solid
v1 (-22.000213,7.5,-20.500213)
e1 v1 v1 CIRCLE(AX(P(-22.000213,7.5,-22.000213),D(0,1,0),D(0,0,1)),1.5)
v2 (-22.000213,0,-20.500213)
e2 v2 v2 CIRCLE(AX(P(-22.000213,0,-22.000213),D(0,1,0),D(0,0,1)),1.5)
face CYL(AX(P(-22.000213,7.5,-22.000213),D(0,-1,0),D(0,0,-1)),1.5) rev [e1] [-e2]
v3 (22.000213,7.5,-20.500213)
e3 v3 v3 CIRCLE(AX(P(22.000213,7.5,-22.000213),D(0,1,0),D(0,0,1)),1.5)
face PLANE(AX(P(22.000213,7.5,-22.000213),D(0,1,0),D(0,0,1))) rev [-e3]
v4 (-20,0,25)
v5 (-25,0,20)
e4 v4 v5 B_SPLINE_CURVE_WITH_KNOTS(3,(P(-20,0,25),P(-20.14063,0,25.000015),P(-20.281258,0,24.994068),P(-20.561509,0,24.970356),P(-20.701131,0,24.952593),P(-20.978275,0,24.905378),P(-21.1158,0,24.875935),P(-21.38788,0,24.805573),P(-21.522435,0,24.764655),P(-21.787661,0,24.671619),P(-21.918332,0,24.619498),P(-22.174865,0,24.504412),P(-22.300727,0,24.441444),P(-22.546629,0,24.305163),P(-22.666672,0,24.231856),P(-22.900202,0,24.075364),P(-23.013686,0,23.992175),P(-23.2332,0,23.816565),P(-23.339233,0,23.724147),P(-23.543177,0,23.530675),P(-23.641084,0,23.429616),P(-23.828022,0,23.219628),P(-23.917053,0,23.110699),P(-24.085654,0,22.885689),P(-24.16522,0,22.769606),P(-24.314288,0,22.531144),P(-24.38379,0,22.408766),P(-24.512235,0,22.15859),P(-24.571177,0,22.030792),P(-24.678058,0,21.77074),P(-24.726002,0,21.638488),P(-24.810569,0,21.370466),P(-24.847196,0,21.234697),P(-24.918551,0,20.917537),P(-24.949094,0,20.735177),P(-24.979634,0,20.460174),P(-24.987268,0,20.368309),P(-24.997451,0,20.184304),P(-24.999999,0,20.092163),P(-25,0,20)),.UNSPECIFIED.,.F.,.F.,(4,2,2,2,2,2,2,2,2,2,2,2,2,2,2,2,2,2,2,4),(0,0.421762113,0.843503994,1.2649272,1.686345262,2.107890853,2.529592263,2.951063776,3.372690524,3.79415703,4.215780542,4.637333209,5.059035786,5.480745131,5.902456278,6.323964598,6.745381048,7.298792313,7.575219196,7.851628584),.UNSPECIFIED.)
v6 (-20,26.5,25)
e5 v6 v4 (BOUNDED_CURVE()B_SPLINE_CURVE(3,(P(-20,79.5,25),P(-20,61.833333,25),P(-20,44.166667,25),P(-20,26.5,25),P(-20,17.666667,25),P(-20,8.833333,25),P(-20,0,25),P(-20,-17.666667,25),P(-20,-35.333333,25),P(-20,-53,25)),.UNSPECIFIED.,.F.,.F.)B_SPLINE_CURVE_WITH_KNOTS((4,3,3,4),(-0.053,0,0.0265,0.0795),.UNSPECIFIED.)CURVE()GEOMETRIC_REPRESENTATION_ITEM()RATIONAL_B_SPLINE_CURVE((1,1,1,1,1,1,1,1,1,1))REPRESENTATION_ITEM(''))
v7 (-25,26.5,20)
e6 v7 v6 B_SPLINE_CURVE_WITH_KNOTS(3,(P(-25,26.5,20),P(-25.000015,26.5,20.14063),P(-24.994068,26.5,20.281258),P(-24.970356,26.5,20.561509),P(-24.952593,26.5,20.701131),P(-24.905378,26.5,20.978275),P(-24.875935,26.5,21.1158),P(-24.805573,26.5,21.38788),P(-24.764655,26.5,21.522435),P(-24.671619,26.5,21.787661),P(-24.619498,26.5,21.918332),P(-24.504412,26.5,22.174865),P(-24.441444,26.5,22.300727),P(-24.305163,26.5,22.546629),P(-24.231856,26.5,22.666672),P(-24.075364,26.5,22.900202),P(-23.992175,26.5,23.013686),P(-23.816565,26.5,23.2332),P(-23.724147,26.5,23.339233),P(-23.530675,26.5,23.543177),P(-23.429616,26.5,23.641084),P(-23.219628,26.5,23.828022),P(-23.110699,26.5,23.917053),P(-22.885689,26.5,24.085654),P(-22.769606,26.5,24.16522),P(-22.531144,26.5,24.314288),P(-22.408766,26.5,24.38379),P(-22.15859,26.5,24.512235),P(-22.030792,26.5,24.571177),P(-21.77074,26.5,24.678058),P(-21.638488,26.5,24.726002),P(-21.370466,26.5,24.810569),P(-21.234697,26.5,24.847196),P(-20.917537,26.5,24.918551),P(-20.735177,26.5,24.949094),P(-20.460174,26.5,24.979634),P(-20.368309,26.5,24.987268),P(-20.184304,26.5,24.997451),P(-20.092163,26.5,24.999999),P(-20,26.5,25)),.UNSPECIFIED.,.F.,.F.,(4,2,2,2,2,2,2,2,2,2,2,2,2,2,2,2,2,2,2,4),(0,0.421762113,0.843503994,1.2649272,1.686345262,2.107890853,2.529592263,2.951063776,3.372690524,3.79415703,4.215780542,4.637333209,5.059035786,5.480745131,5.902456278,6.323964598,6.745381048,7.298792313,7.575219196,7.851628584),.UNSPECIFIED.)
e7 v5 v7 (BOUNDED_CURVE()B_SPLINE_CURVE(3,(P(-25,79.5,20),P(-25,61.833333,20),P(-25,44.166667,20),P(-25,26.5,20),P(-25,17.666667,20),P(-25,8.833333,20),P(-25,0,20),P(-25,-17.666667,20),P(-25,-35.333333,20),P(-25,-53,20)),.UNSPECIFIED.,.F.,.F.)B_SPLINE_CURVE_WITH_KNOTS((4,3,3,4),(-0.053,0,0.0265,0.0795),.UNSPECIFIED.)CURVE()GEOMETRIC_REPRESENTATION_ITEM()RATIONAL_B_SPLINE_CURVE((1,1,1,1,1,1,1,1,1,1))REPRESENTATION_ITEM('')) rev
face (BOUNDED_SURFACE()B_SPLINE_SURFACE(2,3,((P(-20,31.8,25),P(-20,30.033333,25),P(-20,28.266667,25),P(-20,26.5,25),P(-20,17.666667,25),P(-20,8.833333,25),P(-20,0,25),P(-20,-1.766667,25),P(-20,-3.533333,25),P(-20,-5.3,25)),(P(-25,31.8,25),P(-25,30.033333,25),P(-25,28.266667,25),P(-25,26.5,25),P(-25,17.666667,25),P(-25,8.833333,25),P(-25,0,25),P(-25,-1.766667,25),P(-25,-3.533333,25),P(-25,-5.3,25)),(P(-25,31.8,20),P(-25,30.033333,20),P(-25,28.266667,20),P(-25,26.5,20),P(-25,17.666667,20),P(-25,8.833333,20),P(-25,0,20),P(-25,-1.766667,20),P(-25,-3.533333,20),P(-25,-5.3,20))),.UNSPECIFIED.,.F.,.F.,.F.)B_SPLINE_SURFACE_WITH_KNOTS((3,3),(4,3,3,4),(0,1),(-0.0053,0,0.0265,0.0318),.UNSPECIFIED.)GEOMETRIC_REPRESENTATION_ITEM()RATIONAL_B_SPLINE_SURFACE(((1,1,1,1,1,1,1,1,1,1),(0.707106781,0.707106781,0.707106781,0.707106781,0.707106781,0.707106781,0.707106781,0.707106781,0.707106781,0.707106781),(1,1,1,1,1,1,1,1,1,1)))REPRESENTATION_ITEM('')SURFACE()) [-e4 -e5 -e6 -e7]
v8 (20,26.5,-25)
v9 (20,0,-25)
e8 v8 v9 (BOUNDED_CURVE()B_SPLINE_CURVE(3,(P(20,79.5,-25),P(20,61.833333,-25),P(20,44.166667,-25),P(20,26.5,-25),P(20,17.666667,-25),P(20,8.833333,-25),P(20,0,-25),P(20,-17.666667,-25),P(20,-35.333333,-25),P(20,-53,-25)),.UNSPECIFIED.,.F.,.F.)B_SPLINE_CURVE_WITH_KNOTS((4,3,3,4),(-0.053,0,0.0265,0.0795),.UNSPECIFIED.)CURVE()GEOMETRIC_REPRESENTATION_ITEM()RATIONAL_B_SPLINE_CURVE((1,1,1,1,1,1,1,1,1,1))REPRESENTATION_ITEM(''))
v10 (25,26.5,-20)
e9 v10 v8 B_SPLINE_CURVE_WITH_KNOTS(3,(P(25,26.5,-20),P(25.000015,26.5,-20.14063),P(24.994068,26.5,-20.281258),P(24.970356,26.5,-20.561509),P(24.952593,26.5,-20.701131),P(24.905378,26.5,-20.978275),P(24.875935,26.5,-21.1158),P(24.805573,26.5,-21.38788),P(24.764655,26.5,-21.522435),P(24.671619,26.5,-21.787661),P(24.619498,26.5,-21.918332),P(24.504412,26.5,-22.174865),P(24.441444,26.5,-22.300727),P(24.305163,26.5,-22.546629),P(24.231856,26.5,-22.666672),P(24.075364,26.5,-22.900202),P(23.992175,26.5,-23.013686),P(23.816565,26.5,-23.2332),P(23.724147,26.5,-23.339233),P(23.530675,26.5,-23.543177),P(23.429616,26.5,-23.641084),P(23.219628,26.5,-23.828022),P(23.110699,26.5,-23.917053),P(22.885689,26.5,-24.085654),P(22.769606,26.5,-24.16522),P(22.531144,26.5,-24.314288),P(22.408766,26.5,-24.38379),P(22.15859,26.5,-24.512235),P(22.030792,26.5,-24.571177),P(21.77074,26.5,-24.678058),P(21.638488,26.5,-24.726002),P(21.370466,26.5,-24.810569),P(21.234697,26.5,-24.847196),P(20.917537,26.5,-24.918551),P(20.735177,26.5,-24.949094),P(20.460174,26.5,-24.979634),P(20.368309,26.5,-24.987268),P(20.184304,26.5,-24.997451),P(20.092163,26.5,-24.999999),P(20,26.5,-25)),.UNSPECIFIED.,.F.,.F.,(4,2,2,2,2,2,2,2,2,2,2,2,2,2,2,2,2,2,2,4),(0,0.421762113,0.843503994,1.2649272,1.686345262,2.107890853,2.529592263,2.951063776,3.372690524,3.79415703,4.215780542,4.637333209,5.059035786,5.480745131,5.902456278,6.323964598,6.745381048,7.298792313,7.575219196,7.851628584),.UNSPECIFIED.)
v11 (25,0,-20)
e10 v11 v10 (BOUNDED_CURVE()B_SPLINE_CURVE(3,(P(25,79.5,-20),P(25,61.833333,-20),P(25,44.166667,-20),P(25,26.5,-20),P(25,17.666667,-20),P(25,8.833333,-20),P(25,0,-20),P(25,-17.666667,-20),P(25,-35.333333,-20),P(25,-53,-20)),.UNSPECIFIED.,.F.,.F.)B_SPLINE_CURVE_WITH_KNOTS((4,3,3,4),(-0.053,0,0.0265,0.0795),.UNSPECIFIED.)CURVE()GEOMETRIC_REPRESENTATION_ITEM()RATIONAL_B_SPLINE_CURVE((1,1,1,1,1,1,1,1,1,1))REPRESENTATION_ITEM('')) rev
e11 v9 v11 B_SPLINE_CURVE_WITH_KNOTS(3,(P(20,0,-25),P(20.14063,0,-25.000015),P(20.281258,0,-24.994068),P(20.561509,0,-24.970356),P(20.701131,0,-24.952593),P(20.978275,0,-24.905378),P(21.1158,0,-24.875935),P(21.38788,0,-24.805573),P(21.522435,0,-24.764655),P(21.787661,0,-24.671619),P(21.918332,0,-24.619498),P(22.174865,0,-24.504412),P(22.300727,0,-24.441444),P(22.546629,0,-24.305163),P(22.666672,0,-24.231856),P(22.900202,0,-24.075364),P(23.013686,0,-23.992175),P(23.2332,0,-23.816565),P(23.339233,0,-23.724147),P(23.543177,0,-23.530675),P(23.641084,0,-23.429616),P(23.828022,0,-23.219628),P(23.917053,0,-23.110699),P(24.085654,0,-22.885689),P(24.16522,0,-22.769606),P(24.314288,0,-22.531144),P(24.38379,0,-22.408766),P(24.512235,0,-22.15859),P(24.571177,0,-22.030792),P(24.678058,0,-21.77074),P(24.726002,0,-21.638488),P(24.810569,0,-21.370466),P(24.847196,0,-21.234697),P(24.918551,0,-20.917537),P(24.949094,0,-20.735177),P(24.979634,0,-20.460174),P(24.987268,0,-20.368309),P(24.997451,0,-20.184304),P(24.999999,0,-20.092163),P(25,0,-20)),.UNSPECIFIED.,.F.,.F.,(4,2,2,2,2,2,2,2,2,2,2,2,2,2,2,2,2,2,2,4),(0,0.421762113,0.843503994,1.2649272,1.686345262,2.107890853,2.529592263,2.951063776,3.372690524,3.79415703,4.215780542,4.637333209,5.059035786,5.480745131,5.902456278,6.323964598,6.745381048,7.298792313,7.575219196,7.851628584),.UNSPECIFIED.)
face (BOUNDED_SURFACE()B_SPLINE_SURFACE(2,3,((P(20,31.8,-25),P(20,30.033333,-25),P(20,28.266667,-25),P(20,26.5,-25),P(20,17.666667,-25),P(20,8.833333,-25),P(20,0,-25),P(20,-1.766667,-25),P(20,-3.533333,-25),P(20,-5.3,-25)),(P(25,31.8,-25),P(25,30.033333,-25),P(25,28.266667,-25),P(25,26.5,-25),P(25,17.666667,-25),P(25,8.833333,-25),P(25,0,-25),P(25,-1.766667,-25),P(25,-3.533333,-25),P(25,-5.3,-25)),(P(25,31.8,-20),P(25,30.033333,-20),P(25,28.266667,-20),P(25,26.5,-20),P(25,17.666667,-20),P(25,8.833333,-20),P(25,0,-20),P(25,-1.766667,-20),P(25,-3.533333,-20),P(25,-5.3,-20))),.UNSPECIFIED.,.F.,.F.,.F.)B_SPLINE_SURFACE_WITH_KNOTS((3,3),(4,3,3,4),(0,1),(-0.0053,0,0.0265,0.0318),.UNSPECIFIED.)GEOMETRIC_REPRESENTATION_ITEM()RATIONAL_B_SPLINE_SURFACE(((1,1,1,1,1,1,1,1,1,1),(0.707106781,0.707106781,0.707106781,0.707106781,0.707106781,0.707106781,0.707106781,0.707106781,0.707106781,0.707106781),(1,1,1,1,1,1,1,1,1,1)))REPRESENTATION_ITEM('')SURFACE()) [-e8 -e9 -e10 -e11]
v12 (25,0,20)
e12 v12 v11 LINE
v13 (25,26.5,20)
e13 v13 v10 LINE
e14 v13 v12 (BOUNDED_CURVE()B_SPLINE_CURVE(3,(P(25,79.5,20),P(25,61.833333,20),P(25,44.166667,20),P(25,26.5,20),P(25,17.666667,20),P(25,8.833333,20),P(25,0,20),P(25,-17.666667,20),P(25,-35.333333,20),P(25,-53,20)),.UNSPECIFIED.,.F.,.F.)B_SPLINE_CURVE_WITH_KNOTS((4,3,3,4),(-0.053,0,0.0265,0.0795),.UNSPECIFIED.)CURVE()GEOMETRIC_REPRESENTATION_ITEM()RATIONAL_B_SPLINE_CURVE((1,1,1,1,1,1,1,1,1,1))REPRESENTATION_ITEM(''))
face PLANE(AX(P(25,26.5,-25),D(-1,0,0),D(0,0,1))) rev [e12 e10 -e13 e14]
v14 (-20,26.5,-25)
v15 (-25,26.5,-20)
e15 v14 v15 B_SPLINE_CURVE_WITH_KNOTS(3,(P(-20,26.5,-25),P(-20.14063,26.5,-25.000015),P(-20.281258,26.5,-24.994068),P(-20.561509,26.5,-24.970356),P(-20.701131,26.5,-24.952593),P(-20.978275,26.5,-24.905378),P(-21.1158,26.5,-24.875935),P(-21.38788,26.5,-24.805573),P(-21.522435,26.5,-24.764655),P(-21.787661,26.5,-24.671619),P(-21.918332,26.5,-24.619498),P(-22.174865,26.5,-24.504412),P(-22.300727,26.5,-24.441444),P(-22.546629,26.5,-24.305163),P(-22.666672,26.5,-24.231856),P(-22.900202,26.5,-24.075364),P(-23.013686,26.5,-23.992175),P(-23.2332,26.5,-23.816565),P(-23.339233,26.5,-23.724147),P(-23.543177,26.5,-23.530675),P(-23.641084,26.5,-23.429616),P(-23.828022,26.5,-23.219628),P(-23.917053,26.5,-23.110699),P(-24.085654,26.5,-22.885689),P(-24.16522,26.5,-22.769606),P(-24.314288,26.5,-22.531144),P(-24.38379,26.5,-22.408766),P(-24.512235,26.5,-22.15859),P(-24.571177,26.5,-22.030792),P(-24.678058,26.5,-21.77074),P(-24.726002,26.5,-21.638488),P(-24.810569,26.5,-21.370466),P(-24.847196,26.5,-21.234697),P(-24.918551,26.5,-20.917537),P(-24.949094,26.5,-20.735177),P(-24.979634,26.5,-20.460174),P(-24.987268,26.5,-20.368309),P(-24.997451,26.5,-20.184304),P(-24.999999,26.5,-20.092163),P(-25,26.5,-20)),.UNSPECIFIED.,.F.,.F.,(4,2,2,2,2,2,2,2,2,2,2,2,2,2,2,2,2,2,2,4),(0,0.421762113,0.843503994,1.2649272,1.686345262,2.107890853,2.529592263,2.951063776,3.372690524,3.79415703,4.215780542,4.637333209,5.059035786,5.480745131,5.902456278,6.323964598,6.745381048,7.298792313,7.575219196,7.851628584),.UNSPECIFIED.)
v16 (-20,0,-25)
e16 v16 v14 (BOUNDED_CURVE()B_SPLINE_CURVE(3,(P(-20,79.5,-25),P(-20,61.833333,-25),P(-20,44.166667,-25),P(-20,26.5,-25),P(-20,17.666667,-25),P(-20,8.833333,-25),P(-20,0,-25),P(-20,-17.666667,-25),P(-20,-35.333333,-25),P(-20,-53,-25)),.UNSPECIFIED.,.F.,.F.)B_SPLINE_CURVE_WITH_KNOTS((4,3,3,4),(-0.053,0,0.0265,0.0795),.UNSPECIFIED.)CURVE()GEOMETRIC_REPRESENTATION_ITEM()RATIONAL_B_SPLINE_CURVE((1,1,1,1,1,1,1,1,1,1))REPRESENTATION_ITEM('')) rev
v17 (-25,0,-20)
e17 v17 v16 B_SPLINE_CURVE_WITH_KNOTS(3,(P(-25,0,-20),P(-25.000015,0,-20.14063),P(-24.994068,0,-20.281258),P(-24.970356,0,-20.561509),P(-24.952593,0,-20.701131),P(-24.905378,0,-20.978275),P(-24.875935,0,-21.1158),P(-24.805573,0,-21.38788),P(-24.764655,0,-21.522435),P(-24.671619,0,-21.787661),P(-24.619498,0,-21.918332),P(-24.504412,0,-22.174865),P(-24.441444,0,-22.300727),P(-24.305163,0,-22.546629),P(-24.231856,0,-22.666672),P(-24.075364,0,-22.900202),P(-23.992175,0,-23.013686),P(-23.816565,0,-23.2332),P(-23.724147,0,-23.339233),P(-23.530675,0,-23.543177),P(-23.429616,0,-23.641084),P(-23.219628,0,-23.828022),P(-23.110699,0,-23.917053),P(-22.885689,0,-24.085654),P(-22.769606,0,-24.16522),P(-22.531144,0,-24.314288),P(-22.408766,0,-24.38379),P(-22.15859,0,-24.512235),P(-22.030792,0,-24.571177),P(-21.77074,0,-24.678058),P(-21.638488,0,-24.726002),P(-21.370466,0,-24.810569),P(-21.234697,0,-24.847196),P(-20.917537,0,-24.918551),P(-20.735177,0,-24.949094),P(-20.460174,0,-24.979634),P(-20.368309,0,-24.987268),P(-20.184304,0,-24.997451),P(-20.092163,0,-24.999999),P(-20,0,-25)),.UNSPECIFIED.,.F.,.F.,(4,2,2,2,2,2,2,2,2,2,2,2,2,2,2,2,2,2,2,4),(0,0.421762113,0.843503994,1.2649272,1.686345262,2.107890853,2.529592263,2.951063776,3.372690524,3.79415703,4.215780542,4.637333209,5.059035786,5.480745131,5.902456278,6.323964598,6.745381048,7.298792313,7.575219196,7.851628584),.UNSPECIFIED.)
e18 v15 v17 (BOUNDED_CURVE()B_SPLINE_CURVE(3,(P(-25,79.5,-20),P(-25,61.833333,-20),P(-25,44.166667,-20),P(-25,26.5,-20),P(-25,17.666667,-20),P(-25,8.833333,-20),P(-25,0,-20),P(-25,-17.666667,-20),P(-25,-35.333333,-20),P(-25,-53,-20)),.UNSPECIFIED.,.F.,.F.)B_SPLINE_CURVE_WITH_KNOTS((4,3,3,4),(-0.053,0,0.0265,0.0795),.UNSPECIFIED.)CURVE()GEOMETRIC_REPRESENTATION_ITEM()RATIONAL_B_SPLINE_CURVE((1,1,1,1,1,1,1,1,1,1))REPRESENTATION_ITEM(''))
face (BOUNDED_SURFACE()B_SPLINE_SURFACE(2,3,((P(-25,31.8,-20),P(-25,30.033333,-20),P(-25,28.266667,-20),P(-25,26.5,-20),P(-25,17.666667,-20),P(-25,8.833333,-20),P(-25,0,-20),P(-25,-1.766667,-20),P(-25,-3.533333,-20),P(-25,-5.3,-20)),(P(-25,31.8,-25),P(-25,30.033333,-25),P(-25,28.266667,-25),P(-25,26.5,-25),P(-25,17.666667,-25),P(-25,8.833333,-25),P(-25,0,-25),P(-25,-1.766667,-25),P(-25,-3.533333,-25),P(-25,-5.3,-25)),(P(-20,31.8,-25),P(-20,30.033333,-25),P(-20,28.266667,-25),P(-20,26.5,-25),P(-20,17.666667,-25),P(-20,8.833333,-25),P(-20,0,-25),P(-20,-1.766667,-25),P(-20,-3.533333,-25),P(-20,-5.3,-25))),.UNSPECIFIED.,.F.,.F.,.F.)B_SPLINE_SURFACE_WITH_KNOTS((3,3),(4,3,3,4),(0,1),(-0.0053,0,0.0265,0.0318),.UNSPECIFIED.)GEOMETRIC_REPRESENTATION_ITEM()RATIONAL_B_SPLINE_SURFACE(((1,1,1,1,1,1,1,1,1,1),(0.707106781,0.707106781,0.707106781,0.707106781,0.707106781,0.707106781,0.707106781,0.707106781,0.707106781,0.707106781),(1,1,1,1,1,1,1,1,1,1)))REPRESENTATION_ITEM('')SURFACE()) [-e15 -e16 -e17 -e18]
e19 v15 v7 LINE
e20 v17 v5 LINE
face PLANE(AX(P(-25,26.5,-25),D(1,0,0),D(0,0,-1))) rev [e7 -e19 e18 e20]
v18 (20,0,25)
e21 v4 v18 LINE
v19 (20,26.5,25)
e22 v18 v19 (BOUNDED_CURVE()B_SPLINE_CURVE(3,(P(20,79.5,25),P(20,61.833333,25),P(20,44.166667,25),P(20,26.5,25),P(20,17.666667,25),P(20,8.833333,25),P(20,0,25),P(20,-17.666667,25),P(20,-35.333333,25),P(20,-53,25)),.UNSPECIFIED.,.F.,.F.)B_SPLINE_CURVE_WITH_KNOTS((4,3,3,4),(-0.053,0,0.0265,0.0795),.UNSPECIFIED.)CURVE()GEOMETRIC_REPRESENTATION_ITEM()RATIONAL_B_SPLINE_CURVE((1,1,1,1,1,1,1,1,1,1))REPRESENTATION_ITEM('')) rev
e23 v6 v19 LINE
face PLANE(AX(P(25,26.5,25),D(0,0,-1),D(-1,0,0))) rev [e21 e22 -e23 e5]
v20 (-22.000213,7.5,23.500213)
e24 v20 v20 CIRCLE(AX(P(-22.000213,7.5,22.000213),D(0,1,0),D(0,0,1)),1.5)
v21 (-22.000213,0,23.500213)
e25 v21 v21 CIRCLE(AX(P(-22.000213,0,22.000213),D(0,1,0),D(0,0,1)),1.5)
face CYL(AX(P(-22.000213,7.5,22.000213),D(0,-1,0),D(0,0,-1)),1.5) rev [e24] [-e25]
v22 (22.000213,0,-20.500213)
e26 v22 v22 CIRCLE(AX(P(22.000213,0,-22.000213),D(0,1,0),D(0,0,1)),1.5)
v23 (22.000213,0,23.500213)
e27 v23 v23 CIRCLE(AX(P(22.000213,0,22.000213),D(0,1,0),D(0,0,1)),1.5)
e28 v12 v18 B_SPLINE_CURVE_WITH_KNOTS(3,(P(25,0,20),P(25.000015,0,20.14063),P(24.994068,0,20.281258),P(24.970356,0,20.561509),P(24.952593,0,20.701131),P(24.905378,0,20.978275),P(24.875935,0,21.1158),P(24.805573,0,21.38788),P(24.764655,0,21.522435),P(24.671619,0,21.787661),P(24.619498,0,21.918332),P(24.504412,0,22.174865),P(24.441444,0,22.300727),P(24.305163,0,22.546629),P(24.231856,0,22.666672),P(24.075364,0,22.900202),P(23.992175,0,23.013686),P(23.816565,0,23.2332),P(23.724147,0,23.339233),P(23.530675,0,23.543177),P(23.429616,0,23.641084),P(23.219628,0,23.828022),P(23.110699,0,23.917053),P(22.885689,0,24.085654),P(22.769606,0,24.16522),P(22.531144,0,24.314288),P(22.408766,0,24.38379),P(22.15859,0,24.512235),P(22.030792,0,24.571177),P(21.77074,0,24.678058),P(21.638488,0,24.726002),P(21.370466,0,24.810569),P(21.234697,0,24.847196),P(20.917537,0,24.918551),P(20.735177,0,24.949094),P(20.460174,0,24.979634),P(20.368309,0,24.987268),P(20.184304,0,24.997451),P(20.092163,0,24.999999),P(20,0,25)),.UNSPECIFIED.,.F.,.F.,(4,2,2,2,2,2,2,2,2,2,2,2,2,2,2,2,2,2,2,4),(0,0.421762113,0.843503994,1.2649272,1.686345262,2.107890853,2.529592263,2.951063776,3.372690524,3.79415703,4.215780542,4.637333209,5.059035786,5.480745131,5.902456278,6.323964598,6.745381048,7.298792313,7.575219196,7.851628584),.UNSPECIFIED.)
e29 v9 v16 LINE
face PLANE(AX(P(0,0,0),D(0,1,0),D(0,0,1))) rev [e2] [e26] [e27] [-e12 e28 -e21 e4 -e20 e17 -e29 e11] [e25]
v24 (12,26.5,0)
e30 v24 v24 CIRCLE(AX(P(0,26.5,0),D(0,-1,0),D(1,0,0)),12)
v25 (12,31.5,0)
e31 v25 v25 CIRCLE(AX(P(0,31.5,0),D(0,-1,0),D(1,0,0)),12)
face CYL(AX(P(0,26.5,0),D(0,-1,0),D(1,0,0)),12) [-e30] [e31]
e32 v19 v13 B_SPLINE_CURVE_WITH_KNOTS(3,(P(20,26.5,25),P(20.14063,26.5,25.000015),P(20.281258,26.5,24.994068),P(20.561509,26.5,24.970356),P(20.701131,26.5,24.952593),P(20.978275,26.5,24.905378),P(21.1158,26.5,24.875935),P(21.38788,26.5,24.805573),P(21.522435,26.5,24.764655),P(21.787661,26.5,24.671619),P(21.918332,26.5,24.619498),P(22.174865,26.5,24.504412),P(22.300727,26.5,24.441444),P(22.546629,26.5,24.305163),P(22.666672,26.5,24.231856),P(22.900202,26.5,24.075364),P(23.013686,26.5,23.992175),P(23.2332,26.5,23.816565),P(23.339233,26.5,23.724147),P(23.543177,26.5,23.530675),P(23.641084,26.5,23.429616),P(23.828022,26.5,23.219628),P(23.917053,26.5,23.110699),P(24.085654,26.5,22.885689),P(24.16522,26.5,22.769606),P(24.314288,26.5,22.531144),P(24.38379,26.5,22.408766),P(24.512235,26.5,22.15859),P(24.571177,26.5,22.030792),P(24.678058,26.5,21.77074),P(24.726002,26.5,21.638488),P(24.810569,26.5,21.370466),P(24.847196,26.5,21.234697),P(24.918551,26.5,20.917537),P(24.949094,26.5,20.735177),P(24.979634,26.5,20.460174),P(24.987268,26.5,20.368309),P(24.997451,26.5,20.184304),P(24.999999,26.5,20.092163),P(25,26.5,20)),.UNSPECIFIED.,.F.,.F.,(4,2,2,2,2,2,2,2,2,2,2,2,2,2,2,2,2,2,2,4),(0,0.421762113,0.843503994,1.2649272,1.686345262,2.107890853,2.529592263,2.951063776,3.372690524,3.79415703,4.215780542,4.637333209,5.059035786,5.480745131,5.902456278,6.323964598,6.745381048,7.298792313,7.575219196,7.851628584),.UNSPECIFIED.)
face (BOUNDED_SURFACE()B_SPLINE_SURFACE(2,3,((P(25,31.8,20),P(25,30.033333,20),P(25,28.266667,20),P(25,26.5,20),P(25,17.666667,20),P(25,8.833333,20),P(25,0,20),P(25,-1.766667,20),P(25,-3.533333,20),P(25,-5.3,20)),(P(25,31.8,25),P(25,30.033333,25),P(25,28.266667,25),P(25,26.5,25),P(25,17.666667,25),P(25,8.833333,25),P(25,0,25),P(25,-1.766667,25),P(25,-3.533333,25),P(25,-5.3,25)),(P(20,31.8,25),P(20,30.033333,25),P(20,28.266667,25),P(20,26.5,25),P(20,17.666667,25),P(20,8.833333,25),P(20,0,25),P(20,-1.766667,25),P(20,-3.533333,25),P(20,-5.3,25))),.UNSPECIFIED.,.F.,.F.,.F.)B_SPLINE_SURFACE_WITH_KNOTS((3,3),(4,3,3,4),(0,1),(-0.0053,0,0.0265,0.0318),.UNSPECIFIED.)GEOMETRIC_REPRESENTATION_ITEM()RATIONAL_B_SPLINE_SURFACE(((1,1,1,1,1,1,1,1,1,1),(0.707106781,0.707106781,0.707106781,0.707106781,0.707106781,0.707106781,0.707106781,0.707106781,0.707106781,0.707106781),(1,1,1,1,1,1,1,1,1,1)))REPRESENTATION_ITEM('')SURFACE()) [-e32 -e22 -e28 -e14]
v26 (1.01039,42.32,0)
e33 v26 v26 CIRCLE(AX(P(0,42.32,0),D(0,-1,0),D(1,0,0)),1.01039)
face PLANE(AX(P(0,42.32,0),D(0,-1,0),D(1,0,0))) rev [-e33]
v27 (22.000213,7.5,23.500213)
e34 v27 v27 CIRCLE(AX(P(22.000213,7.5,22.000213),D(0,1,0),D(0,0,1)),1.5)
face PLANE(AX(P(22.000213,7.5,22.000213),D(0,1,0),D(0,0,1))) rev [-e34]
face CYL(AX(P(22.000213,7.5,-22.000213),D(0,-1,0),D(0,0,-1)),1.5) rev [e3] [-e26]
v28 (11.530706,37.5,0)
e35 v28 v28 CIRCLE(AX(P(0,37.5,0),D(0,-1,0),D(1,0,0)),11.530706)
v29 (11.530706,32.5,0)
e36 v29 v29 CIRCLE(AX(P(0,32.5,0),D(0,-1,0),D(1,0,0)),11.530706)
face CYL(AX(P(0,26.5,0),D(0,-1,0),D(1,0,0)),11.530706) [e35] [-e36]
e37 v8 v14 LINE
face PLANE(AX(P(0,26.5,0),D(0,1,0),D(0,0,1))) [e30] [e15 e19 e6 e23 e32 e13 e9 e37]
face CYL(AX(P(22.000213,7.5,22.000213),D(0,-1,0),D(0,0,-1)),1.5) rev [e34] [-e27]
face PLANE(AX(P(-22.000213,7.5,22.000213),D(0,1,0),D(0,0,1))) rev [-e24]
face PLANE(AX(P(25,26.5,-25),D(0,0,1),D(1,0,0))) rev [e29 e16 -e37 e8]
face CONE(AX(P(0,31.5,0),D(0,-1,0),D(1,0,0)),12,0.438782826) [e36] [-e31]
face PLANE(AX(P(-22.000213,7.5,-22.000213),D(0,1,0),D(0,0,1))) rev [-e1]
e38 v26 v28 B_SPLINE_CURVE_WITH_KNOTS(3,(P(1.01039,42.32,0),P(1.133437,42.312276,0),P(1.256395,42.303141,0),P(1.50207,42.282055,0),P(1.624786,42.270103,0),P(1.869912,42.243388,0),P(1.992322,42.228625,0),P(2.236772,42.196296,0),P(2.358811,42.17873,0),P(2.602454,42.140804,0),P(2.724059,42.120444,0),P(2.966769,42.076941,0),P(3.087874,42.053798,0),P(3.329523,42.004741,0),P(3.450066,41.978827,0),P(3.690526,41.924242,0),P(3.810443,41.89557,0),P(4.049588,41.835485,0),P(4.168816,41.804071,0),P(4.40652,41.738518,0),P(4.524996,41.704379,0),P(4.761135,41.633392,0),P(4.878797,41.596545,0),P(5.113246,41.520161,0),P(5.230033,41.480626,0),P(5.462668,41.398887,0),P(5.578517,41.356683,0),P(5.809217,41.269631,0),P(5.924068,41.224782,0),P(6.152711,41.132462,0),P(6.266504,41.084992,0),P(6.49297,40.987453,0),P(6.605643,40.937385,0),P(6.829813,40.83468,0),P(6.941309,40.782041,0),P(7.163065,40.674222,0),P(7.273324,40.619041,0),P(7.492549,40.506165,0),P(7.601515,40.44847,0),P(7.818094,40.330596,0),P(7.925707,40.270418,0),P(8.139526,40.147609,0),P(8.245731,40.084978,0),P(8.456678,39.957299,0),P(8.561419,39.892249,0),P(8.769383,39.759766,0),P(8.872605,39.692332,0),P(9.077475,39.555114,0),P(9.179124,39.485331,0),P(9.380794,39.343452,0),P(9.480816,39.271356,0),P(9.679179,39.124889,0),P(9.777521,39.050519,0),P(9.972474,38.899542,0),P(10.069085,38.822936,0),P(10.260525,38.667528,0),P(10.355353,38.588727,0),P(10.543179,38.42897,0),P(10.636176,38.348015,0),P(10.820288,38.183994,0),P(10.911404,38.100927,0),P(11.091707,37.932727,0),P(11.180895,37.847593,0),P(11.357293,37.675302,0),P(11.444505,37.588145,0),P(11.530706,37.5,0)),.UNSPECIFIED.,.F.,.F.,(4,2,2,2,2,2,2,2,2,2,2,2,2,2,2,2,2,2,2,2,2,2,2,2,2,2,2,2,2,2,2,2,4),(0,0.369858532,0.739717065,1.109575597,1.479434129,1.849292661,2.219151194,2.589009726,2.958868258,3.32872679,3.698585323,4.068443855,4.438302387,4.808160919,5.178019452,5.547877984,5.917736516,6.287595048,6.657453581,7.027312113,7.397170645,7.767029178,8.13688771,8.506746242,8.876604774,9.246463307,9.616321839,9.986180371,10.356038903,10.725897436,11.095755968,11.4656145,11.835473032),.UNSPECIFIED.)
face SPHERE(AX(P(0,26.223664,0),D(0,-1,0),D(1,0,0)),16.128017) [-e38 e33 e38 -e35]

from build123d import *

# Parameters (mm, degrees)
SKETCH3_W           = 50
SKETCH3_H           = 50
BOSS_EXTRUDE1_DEPTH = 26.5
SKETCH4_R           = 1.5
CUT_EXTRUDE1_DEPTH  = 7.5
VARFILLET1_START    = -1
VARFILLET1_DEPTH    = 28


with BuildPart() as part:
    # Sketch3 → Boss-Extrude1 (new body)
    with BuildSketch(Plane(origin=(0, 0, 0), x_dir=(1, 0, 0), z_dir=(0, 1, 0))):
        Rectangle(SKETCH3_W, SKETCH3_H)
    extrude(amount=BOSS_EXTRUDE1_DEPTH)

    # Sketch4 → Cut-Extrude1 (cut)
    with BuildSketch(Plane(origin=(0, 0, 0), x_dir=(1, 0, 0), z_dir=(0, 1, 0))):
        with Locations(Location((22.000213283, 22.000213283, 0), (0, 0, 270))):
            Circle(SKETCH4_R)
        with Locations(Location((22.000213283, -22.000213283, 0), (0, 0, 270))):
            Circle(SKETCH4_R)
        with Locations(Location((-22.000213283, -22.000213283, 0), (0, 0, 270))):
            Circle(SKETCH4_R)
        with Locations(Location((-22.000213283, 22.000213283, 0), (0, 0, 270))):
            Circle(SKETCH4_R)
    extrude(amount=CUT_EXTRUDE1_DEPTH, mode=Mode.SUBTRACT)

    # Sketch6 → Revolve1 (revolve)
    with BuildSketch(Plane.XY):
        with BuildLine():
            Line((0, 42.32), (0, 26.5))
            Line((0, 26.5), (12, 26.5))
            Line((12, 26.5), (12, 31.5))
            Line((12, 31.5), (11.530705563, 32.5))
            Line((11.530705563, 32.5), (11.530705563, 37.5))
            ThreePointArc((11.530705563, 37.5), (6.71772817, 40.886032515), (1.010390364, 42.32))
            Line((1.010390364, 42.32), (0, 42.32))
        make_face()
    revolve(axis=Axis((0, 26.5, 0), (0, 1, 0)))

    # VarFillet1: read off the stored shape, not the designer's step
    # VarFillet1 outline → VarFillet1 (cut)
    with BuildSketch(Plane(origin=(0, 0, 0), x_dir=(1, 0, 0), z_dir=(0, 1, 0)).offset(VARFILLET1_START)):
        with BuildLine():
            Line((-25, -25), (-20, -25))
            add(Edge.make_bspline(
                [(-20, -25), (-25, -25), (-25, -20)],
                knots=[0, 0, 0, 1, 1, 1], degree=2, weights=[1, 0.707106781, 1]))
            Line((-25, -20), (-25, -25))
        make_face()
        with BuildLine():
            add(Edge.make_bspline(
                [(25, -20), (25, -25), (20, -25)],
                knots=[0, 0, 0, 1, 1, 1], degree=2, weights=[1, 0.707106781, 1]))
            Line((20, -25), (25, -25))
            Line((25, -25), (25, -20))
        make_face()
        with BuildLine():
            Line((-25, 25), (-25, 20))
            add(Edge.make_bspline(
                [(-25, 20), (-25, 25), (-20, 25)],
                knots=[0, 0, 0, 1, 1, 1], degree=2, weights=[1, 0.707106781, 1]))
            Line((-20, 25), (-25, 25))
        make_face()
        with BuildLine():
            add(Edge.make_bspline(
                [(20, 25), (25, 25), (25, 20)],
                knots=[0, 0, 0, 1, 1, 1], degree=2, weights=[1, 0.707106781, 1]))
            Line((25, 20), (25, 25))
            Line((25, 25), (20, 25))
        make_face()
    extrude(amount=VARFILLET1_DEPTH, mode=Mode.SUBTRACT)


solid = part.part
